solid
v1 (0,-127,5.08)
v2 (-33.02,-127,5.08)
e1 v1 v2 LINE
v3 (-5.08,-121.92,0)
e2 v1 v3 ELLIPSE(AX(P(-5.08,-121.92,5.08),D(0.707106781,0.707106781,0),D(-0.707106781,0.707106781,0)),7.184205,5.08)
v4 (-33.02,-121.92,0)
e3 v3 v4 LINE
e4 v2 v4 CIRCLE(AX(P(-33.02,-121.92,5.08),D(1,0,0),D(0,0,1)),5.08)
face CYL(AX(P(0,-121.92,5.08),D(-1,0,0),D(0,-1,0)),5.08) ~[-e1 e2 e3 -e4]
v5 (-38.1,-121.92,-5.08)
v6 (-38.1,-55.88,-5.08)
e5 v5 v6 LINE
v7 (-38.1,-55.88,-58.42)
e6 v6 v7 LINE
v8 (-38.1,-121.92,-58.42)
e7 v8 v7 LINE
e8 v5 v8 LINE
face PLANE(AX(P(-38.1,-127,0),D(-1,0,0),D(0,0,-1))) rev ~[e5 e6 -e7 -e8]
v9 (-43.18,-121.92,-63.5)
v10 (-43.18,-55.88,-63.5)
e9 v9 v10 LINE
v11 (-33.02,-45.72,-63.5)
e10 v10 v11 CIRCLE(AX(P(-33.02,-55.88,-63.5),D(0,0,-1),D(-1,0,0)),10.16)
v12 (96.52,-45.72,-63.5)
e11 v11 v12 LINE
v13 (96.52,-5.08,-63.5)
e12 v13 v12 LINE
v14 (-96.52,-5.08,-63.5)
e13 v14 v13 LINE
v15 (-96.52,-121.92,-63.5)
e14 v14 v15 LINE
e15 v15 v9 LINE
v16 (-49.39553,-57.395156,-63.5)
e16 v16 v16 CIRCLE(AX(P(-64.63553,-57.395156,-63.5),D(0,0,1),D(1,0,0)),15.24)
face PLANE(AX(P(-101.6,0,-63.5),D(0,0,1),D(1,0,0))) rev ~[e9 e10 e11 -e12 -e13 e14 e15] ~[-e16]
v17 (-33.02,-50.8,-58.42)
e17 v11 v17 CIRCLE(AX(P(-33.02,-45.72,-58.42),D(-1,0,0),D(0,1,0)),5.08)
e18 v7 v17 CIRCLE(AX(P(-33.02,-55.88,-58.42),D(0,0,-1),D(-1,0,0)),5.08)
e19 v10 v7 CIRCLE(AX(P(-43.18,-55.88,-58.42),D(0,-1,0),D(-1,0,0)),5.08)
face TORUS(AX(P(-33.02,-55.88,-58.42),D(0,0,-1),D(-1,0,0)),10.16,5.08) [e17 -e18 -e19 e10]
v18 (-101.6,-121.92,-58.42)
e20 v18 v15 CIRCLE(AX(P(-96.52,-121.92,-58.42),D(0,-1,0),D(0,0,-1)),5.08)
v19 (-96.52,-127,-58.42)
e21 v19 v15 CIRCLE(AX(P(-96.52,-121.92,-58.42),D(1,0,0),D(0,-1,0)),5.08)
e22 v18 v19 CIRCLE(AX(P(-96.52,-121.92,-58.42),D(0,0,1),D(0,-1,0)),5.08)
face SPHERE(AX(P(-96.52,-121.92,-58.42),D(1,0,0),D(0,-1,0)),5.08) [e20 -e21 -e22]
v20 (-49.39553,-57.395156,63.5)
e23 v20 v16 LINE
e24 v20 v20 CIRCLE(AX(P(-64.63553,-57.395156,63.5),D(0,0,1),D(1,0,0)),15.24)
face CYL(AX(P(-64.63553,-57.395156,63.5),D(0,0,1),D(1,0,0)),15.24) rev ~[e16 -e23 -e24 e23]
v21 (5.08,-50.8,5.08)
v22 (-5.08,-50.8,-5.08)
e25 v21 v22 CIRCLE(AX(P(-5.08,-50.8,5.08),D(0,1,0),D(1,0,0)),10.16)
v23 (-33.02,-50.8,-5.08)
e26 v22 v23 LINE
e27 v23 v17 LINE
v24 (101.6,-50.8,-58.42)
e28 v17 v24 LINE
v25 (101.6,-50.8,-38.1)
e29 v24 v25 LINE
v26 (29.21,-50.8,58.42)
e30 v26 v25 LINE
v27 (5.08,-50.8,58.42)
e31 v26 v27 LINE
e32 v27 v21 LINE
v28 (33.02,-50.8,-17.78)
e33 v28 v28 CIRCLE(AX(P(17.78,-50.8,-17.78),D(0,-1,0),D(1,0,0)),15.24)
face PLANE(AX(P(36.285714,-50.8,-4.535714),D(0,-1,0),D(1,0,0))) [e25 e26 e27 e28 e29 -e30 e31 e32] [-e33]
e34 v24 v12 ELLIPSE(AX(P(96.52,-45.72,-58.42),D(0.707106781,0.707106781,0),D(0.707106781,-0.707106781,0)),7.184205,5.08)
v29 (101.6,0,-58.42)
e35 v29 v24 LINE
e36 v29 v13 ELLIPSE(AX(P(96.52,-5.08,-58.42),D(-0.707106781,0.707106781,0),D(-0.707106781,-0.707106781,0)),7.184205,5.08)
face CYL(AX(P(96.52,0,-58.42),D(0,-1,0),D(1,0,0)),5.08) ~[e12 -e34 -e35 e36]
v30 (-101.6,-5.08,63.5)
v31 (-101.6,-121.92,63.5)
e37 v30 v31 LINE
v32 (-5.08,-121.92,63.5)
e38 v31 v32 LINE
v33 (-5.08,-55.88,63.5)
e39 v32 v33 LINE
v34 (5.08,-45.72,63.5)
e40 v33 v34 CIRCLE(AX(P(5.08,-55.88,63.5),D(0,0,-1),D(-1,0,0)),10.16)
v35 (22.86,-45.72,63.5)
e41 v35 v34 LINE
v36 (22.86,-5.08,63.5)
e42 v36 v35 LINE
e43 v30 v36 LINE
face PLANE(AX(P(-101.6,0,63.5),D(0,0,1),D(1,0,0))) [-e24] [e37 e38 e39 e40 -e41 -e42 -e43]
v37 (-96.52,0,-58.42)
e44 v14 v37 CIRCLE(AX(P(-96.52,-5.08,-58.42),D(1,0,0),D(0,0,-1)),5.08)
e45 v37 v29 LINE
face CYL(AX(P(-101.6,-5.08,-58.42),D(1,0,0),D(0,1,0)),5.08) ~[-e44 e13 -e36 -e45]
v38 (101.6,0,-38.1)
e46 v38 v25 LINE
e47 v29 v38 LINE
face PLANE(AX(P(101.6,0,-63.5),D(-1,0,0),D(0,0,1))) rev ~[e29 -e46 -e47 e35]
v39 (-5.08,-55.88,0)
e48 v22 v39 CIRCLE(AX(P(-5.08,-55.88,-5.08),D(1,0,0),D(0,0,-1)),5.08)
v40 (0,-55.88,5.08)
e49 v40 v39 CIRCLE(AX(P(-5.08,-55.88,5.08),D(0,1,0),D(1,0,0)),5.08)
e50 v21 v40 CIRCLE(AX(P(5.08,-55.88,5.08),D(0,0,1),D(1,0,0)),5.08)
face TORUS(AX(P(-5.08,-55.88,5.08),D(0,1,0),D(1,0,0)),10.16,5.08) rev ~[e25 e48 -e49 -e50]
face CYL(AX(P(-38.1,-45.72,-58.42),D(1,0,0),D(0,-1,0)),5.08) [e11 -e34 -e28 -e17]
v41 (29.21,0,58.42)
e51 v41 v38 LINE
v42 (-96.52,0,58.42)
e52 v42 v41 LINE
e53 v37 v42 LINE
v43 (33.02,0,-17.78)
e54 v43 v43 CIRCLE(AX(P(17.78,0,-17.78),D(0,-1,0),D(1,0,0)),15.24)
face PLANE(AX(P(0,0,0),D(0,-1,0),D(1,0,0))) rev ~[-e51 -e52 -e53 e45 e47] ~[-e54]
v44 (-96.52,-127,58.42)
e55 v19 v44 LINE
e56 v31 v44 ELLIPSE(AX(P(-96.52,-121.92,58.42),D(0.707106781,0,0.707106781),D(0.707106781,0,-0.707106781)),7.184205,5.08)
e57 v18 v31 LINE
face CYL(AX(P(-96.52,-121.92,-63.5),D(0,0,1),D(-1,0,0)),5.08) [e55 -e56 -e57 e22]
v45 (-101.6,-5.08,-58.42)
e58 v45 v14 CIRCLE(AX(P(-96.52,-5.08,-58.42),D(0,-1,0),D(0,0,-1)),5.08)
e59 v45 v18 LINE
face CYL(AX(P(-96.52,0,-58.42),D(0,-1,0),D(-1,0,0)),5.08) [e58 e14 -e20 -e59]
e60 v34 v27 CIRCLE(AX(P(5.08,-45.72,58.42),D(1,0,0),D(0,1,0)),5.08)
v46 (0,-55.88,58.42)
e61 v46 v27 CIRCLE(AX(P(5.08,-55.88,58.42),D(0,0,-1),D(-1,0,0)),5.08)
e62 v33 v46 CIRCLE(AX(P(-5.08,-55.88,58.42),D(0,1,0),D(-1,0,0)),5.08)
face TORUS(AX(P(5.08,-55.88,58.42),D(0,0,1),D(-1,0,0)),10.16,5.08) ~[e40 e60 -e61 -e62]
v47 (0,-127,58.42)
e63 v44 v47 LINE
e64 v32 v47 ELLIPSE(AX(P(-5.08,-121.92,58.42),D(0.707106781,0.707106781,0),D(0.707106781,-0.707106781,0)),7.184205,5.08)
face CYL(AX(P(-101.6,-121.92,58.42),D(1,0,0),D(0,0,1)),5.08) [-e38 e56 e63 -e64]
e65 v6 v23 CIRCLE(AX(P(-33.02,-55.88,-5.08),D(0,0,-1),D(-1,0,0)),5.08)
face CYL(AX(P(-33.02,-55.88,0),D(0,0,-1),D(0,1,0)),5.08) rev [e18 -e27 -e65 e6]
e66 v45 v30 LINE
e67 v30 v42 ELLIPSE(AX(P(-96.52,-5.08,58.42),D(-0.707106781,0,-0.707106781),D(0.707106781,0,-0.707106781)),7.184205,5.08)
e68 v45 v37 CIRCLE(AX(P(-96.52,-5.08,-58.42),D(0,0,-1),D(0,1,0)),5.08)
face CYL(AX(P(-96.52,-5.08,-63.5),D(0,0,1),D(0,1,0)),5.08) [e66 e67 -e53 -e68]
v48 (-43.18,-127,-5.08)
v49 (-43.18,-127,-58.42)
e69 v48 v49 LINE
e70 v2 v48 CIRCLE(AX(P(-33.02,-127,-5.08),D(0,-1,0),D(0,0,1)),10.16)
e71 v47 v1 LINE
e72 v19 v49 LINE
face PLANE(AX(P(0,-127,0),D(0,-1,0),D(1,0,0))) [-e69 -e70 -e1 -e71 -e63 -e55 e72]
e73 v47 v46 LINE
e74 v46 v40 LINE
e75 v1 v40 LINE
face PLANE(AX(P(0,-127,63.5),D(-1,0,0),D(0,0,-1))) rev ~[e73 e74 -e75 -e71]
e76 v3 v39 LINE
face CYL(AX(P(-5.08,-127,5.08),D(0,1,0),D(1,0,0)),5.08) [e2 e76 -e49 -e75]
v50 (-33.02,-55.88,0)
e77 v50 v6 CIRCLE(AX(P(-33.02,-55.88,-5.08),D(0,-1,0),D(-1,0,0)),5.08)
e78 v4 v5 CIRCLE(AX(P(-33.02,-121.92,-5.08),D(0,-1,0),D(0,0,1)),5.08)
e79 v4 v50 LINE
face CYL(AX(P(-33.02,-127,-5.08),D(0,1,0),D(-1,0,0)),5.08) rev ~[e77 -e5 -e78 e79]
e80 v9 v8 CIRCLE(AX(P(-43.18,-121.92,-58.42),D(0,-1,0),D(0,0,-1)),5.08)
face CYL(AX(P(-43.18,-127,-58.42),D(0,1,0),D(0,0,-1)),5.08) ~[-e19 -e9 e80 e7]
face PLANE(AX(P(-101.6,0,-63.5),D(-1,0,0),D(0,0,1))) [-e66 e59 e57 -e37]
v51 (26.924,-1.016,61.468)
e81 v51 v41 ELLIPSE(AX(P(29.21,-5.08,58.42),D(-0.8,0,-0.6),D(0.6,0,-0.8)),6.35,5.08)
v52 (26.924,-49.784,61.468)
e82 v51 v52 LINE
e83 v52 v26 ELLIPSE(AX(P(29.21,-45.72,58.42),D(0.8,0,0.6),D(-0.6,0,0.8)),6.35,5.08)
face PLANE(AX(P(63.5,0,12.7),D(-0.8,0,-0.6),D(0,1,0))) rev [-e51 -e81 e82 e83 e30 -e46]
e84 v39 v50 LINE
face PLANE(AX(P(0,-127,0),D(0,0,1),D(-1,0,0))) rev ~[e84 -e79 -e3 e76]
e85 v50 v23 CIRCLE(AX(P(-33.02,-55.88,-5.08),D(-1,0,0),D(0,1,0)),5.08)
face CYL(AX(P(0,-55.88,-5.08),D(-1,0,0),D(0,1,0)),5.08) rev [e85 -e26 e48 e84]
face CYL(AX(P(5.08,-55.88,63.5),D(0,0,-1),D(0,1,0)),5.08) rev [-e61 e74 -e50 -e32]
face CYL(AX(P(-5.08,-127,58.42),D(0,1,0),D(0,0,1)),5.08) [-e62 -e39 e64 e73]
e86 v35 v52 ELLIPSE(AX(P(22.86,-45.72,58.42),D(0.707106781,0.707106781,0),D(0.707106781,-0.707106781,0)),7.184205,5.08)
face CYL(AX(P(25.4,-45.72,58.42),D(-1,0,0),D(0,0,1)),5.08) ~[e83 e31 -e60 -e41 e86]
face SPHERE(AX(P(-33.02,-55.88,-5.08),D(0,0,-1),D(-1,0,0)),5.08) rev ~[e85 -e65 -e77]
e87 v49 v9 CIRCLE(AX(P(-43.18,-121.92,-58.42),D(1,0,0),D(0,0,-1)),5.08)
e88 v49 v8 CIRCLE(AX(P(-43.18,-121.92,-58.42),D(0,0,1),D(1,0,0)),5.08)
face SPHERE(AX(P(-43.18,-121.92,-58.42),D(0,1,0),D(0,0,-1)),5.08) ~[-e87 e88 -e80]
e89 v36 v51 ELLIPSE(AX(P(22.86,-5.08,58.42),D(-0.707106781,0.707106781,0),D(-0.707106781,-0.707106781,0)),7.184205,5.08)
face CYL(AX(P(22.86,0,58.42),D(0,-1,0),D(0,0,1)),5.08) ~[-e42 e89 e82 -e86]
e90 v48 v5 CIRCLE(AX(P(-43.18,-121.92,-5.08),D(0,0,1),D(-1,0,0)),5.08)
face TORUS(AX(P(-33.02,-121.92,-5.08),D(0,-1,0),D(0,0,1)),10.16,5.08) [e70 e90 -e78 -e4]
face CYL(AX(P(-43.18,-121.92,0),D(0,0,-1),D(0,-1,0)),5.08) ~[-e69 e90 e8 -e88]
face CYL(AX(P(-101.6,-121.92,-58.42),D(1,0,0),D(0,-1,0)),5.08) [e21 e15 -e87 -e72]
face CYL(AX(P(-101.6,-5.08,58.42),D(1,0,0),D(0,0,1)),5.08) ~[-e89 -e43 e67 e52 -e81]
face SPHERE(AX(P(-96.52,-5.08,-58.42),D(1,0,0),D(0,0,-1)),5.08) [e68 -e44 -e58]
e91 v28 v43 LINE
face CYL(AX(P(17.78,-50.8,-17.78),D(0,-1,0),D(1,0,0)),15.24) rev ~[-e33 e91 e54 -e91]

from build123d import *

# Parameters (mm, degrees)
F0_W     = 203.2
F0_H     = 127
F1_DEPTH = 127
F3_DEPTH = 76.2
F4_SIZE2 = 101.6
F4_SIZE  = 76.2
F5_R     = 5.08
F6_R     = 15.24
F7_DEPTH = 50.8
F8_R     = 15.24
F9_DEPTH = 127


with BuildPart() as f1:
    # F0 (on Front) → F1 (new body)
    with BuildSketch(Plane.XZ):
        Rectangle(F0_W, F0_H)
    extrude(amount=F1_DEPTH)

    # F2 (on face) → F3 (cut)
    with BuildSketch(Plane.XZ.offset(127)):
        Polygon((-38.1, 0), (-38.1, -63.5), (101.6, -63.5), (101.6, 63.5), (0, 63.5), (0, 0), align=None)
    extrude(amount=-F3_DEPTH, mode=Mode.SUBTRACT)

    # F4
    f4_edges = [f1.edges().sort_by_distance(p)[0] for p in [
        (101.6, -25.4, 63.5),
    ]]
    f4_side = f1.faces().sort_by_distance((-21.771429, -52.614286, 63.5))[0]
    chamfer(f4_edges, length=F4_SIZE, length2=F4_SIZE2, reference=f4_side)

    # F5
    f5_edges = [f1.edges().sort_by_distance(p)[0] for p in [
        (-50.8, -127, 63.5),
        (-19.05, -127, 0),
        (0, -88.9, 63.5),
        (0, -88.9, 0),
        (12.7, -50.8, 63.5),
        (25.4, -25.4, 63.5),
        (-38.1, 0, 63.5),
        (-38.1, -88.9, -63.5),
        (-69.85, -127, -63.5),
        (-38.1, -127, -31.75),
        (-101.6, -127, 0),
        (31.75, -50.8, -63.5),
        (101.6, -25.4, -63.5),
        (-38.1, -50.8, -31.75),
        (0, -50.8, 31.75),
        (-38.1, -88.9, 0),
        (0, 0, -63.5),
        (-101.6, -63.5, -63.5),
        (-101.6, 0, 0),
        (-19.05, -50.8, 0),
    ]]
    fillet(f5_edges, radius=F5_R)

    # F6 (on face) → F7 (cut, through all)
    with BuildSketch(Plane.XZ.offset(50.8)):
        with Locations((17.78, -17.78)):
            Circle(F6_R)
    extrude(amount=-F7_DEPTH, mode=Mode.SUBTRACT)

    # F8 (on face) → F9 (cut, through all)
    with BuildSketch(Plane.XY.offset(63.5)):
        with Locations((-64.6355301142, -57.3951564729)):
            Circle(F8_R)
    extrude(amount=-F9_DEPTH, mode=Mode.SUBTRACT)


solid = f1.part
